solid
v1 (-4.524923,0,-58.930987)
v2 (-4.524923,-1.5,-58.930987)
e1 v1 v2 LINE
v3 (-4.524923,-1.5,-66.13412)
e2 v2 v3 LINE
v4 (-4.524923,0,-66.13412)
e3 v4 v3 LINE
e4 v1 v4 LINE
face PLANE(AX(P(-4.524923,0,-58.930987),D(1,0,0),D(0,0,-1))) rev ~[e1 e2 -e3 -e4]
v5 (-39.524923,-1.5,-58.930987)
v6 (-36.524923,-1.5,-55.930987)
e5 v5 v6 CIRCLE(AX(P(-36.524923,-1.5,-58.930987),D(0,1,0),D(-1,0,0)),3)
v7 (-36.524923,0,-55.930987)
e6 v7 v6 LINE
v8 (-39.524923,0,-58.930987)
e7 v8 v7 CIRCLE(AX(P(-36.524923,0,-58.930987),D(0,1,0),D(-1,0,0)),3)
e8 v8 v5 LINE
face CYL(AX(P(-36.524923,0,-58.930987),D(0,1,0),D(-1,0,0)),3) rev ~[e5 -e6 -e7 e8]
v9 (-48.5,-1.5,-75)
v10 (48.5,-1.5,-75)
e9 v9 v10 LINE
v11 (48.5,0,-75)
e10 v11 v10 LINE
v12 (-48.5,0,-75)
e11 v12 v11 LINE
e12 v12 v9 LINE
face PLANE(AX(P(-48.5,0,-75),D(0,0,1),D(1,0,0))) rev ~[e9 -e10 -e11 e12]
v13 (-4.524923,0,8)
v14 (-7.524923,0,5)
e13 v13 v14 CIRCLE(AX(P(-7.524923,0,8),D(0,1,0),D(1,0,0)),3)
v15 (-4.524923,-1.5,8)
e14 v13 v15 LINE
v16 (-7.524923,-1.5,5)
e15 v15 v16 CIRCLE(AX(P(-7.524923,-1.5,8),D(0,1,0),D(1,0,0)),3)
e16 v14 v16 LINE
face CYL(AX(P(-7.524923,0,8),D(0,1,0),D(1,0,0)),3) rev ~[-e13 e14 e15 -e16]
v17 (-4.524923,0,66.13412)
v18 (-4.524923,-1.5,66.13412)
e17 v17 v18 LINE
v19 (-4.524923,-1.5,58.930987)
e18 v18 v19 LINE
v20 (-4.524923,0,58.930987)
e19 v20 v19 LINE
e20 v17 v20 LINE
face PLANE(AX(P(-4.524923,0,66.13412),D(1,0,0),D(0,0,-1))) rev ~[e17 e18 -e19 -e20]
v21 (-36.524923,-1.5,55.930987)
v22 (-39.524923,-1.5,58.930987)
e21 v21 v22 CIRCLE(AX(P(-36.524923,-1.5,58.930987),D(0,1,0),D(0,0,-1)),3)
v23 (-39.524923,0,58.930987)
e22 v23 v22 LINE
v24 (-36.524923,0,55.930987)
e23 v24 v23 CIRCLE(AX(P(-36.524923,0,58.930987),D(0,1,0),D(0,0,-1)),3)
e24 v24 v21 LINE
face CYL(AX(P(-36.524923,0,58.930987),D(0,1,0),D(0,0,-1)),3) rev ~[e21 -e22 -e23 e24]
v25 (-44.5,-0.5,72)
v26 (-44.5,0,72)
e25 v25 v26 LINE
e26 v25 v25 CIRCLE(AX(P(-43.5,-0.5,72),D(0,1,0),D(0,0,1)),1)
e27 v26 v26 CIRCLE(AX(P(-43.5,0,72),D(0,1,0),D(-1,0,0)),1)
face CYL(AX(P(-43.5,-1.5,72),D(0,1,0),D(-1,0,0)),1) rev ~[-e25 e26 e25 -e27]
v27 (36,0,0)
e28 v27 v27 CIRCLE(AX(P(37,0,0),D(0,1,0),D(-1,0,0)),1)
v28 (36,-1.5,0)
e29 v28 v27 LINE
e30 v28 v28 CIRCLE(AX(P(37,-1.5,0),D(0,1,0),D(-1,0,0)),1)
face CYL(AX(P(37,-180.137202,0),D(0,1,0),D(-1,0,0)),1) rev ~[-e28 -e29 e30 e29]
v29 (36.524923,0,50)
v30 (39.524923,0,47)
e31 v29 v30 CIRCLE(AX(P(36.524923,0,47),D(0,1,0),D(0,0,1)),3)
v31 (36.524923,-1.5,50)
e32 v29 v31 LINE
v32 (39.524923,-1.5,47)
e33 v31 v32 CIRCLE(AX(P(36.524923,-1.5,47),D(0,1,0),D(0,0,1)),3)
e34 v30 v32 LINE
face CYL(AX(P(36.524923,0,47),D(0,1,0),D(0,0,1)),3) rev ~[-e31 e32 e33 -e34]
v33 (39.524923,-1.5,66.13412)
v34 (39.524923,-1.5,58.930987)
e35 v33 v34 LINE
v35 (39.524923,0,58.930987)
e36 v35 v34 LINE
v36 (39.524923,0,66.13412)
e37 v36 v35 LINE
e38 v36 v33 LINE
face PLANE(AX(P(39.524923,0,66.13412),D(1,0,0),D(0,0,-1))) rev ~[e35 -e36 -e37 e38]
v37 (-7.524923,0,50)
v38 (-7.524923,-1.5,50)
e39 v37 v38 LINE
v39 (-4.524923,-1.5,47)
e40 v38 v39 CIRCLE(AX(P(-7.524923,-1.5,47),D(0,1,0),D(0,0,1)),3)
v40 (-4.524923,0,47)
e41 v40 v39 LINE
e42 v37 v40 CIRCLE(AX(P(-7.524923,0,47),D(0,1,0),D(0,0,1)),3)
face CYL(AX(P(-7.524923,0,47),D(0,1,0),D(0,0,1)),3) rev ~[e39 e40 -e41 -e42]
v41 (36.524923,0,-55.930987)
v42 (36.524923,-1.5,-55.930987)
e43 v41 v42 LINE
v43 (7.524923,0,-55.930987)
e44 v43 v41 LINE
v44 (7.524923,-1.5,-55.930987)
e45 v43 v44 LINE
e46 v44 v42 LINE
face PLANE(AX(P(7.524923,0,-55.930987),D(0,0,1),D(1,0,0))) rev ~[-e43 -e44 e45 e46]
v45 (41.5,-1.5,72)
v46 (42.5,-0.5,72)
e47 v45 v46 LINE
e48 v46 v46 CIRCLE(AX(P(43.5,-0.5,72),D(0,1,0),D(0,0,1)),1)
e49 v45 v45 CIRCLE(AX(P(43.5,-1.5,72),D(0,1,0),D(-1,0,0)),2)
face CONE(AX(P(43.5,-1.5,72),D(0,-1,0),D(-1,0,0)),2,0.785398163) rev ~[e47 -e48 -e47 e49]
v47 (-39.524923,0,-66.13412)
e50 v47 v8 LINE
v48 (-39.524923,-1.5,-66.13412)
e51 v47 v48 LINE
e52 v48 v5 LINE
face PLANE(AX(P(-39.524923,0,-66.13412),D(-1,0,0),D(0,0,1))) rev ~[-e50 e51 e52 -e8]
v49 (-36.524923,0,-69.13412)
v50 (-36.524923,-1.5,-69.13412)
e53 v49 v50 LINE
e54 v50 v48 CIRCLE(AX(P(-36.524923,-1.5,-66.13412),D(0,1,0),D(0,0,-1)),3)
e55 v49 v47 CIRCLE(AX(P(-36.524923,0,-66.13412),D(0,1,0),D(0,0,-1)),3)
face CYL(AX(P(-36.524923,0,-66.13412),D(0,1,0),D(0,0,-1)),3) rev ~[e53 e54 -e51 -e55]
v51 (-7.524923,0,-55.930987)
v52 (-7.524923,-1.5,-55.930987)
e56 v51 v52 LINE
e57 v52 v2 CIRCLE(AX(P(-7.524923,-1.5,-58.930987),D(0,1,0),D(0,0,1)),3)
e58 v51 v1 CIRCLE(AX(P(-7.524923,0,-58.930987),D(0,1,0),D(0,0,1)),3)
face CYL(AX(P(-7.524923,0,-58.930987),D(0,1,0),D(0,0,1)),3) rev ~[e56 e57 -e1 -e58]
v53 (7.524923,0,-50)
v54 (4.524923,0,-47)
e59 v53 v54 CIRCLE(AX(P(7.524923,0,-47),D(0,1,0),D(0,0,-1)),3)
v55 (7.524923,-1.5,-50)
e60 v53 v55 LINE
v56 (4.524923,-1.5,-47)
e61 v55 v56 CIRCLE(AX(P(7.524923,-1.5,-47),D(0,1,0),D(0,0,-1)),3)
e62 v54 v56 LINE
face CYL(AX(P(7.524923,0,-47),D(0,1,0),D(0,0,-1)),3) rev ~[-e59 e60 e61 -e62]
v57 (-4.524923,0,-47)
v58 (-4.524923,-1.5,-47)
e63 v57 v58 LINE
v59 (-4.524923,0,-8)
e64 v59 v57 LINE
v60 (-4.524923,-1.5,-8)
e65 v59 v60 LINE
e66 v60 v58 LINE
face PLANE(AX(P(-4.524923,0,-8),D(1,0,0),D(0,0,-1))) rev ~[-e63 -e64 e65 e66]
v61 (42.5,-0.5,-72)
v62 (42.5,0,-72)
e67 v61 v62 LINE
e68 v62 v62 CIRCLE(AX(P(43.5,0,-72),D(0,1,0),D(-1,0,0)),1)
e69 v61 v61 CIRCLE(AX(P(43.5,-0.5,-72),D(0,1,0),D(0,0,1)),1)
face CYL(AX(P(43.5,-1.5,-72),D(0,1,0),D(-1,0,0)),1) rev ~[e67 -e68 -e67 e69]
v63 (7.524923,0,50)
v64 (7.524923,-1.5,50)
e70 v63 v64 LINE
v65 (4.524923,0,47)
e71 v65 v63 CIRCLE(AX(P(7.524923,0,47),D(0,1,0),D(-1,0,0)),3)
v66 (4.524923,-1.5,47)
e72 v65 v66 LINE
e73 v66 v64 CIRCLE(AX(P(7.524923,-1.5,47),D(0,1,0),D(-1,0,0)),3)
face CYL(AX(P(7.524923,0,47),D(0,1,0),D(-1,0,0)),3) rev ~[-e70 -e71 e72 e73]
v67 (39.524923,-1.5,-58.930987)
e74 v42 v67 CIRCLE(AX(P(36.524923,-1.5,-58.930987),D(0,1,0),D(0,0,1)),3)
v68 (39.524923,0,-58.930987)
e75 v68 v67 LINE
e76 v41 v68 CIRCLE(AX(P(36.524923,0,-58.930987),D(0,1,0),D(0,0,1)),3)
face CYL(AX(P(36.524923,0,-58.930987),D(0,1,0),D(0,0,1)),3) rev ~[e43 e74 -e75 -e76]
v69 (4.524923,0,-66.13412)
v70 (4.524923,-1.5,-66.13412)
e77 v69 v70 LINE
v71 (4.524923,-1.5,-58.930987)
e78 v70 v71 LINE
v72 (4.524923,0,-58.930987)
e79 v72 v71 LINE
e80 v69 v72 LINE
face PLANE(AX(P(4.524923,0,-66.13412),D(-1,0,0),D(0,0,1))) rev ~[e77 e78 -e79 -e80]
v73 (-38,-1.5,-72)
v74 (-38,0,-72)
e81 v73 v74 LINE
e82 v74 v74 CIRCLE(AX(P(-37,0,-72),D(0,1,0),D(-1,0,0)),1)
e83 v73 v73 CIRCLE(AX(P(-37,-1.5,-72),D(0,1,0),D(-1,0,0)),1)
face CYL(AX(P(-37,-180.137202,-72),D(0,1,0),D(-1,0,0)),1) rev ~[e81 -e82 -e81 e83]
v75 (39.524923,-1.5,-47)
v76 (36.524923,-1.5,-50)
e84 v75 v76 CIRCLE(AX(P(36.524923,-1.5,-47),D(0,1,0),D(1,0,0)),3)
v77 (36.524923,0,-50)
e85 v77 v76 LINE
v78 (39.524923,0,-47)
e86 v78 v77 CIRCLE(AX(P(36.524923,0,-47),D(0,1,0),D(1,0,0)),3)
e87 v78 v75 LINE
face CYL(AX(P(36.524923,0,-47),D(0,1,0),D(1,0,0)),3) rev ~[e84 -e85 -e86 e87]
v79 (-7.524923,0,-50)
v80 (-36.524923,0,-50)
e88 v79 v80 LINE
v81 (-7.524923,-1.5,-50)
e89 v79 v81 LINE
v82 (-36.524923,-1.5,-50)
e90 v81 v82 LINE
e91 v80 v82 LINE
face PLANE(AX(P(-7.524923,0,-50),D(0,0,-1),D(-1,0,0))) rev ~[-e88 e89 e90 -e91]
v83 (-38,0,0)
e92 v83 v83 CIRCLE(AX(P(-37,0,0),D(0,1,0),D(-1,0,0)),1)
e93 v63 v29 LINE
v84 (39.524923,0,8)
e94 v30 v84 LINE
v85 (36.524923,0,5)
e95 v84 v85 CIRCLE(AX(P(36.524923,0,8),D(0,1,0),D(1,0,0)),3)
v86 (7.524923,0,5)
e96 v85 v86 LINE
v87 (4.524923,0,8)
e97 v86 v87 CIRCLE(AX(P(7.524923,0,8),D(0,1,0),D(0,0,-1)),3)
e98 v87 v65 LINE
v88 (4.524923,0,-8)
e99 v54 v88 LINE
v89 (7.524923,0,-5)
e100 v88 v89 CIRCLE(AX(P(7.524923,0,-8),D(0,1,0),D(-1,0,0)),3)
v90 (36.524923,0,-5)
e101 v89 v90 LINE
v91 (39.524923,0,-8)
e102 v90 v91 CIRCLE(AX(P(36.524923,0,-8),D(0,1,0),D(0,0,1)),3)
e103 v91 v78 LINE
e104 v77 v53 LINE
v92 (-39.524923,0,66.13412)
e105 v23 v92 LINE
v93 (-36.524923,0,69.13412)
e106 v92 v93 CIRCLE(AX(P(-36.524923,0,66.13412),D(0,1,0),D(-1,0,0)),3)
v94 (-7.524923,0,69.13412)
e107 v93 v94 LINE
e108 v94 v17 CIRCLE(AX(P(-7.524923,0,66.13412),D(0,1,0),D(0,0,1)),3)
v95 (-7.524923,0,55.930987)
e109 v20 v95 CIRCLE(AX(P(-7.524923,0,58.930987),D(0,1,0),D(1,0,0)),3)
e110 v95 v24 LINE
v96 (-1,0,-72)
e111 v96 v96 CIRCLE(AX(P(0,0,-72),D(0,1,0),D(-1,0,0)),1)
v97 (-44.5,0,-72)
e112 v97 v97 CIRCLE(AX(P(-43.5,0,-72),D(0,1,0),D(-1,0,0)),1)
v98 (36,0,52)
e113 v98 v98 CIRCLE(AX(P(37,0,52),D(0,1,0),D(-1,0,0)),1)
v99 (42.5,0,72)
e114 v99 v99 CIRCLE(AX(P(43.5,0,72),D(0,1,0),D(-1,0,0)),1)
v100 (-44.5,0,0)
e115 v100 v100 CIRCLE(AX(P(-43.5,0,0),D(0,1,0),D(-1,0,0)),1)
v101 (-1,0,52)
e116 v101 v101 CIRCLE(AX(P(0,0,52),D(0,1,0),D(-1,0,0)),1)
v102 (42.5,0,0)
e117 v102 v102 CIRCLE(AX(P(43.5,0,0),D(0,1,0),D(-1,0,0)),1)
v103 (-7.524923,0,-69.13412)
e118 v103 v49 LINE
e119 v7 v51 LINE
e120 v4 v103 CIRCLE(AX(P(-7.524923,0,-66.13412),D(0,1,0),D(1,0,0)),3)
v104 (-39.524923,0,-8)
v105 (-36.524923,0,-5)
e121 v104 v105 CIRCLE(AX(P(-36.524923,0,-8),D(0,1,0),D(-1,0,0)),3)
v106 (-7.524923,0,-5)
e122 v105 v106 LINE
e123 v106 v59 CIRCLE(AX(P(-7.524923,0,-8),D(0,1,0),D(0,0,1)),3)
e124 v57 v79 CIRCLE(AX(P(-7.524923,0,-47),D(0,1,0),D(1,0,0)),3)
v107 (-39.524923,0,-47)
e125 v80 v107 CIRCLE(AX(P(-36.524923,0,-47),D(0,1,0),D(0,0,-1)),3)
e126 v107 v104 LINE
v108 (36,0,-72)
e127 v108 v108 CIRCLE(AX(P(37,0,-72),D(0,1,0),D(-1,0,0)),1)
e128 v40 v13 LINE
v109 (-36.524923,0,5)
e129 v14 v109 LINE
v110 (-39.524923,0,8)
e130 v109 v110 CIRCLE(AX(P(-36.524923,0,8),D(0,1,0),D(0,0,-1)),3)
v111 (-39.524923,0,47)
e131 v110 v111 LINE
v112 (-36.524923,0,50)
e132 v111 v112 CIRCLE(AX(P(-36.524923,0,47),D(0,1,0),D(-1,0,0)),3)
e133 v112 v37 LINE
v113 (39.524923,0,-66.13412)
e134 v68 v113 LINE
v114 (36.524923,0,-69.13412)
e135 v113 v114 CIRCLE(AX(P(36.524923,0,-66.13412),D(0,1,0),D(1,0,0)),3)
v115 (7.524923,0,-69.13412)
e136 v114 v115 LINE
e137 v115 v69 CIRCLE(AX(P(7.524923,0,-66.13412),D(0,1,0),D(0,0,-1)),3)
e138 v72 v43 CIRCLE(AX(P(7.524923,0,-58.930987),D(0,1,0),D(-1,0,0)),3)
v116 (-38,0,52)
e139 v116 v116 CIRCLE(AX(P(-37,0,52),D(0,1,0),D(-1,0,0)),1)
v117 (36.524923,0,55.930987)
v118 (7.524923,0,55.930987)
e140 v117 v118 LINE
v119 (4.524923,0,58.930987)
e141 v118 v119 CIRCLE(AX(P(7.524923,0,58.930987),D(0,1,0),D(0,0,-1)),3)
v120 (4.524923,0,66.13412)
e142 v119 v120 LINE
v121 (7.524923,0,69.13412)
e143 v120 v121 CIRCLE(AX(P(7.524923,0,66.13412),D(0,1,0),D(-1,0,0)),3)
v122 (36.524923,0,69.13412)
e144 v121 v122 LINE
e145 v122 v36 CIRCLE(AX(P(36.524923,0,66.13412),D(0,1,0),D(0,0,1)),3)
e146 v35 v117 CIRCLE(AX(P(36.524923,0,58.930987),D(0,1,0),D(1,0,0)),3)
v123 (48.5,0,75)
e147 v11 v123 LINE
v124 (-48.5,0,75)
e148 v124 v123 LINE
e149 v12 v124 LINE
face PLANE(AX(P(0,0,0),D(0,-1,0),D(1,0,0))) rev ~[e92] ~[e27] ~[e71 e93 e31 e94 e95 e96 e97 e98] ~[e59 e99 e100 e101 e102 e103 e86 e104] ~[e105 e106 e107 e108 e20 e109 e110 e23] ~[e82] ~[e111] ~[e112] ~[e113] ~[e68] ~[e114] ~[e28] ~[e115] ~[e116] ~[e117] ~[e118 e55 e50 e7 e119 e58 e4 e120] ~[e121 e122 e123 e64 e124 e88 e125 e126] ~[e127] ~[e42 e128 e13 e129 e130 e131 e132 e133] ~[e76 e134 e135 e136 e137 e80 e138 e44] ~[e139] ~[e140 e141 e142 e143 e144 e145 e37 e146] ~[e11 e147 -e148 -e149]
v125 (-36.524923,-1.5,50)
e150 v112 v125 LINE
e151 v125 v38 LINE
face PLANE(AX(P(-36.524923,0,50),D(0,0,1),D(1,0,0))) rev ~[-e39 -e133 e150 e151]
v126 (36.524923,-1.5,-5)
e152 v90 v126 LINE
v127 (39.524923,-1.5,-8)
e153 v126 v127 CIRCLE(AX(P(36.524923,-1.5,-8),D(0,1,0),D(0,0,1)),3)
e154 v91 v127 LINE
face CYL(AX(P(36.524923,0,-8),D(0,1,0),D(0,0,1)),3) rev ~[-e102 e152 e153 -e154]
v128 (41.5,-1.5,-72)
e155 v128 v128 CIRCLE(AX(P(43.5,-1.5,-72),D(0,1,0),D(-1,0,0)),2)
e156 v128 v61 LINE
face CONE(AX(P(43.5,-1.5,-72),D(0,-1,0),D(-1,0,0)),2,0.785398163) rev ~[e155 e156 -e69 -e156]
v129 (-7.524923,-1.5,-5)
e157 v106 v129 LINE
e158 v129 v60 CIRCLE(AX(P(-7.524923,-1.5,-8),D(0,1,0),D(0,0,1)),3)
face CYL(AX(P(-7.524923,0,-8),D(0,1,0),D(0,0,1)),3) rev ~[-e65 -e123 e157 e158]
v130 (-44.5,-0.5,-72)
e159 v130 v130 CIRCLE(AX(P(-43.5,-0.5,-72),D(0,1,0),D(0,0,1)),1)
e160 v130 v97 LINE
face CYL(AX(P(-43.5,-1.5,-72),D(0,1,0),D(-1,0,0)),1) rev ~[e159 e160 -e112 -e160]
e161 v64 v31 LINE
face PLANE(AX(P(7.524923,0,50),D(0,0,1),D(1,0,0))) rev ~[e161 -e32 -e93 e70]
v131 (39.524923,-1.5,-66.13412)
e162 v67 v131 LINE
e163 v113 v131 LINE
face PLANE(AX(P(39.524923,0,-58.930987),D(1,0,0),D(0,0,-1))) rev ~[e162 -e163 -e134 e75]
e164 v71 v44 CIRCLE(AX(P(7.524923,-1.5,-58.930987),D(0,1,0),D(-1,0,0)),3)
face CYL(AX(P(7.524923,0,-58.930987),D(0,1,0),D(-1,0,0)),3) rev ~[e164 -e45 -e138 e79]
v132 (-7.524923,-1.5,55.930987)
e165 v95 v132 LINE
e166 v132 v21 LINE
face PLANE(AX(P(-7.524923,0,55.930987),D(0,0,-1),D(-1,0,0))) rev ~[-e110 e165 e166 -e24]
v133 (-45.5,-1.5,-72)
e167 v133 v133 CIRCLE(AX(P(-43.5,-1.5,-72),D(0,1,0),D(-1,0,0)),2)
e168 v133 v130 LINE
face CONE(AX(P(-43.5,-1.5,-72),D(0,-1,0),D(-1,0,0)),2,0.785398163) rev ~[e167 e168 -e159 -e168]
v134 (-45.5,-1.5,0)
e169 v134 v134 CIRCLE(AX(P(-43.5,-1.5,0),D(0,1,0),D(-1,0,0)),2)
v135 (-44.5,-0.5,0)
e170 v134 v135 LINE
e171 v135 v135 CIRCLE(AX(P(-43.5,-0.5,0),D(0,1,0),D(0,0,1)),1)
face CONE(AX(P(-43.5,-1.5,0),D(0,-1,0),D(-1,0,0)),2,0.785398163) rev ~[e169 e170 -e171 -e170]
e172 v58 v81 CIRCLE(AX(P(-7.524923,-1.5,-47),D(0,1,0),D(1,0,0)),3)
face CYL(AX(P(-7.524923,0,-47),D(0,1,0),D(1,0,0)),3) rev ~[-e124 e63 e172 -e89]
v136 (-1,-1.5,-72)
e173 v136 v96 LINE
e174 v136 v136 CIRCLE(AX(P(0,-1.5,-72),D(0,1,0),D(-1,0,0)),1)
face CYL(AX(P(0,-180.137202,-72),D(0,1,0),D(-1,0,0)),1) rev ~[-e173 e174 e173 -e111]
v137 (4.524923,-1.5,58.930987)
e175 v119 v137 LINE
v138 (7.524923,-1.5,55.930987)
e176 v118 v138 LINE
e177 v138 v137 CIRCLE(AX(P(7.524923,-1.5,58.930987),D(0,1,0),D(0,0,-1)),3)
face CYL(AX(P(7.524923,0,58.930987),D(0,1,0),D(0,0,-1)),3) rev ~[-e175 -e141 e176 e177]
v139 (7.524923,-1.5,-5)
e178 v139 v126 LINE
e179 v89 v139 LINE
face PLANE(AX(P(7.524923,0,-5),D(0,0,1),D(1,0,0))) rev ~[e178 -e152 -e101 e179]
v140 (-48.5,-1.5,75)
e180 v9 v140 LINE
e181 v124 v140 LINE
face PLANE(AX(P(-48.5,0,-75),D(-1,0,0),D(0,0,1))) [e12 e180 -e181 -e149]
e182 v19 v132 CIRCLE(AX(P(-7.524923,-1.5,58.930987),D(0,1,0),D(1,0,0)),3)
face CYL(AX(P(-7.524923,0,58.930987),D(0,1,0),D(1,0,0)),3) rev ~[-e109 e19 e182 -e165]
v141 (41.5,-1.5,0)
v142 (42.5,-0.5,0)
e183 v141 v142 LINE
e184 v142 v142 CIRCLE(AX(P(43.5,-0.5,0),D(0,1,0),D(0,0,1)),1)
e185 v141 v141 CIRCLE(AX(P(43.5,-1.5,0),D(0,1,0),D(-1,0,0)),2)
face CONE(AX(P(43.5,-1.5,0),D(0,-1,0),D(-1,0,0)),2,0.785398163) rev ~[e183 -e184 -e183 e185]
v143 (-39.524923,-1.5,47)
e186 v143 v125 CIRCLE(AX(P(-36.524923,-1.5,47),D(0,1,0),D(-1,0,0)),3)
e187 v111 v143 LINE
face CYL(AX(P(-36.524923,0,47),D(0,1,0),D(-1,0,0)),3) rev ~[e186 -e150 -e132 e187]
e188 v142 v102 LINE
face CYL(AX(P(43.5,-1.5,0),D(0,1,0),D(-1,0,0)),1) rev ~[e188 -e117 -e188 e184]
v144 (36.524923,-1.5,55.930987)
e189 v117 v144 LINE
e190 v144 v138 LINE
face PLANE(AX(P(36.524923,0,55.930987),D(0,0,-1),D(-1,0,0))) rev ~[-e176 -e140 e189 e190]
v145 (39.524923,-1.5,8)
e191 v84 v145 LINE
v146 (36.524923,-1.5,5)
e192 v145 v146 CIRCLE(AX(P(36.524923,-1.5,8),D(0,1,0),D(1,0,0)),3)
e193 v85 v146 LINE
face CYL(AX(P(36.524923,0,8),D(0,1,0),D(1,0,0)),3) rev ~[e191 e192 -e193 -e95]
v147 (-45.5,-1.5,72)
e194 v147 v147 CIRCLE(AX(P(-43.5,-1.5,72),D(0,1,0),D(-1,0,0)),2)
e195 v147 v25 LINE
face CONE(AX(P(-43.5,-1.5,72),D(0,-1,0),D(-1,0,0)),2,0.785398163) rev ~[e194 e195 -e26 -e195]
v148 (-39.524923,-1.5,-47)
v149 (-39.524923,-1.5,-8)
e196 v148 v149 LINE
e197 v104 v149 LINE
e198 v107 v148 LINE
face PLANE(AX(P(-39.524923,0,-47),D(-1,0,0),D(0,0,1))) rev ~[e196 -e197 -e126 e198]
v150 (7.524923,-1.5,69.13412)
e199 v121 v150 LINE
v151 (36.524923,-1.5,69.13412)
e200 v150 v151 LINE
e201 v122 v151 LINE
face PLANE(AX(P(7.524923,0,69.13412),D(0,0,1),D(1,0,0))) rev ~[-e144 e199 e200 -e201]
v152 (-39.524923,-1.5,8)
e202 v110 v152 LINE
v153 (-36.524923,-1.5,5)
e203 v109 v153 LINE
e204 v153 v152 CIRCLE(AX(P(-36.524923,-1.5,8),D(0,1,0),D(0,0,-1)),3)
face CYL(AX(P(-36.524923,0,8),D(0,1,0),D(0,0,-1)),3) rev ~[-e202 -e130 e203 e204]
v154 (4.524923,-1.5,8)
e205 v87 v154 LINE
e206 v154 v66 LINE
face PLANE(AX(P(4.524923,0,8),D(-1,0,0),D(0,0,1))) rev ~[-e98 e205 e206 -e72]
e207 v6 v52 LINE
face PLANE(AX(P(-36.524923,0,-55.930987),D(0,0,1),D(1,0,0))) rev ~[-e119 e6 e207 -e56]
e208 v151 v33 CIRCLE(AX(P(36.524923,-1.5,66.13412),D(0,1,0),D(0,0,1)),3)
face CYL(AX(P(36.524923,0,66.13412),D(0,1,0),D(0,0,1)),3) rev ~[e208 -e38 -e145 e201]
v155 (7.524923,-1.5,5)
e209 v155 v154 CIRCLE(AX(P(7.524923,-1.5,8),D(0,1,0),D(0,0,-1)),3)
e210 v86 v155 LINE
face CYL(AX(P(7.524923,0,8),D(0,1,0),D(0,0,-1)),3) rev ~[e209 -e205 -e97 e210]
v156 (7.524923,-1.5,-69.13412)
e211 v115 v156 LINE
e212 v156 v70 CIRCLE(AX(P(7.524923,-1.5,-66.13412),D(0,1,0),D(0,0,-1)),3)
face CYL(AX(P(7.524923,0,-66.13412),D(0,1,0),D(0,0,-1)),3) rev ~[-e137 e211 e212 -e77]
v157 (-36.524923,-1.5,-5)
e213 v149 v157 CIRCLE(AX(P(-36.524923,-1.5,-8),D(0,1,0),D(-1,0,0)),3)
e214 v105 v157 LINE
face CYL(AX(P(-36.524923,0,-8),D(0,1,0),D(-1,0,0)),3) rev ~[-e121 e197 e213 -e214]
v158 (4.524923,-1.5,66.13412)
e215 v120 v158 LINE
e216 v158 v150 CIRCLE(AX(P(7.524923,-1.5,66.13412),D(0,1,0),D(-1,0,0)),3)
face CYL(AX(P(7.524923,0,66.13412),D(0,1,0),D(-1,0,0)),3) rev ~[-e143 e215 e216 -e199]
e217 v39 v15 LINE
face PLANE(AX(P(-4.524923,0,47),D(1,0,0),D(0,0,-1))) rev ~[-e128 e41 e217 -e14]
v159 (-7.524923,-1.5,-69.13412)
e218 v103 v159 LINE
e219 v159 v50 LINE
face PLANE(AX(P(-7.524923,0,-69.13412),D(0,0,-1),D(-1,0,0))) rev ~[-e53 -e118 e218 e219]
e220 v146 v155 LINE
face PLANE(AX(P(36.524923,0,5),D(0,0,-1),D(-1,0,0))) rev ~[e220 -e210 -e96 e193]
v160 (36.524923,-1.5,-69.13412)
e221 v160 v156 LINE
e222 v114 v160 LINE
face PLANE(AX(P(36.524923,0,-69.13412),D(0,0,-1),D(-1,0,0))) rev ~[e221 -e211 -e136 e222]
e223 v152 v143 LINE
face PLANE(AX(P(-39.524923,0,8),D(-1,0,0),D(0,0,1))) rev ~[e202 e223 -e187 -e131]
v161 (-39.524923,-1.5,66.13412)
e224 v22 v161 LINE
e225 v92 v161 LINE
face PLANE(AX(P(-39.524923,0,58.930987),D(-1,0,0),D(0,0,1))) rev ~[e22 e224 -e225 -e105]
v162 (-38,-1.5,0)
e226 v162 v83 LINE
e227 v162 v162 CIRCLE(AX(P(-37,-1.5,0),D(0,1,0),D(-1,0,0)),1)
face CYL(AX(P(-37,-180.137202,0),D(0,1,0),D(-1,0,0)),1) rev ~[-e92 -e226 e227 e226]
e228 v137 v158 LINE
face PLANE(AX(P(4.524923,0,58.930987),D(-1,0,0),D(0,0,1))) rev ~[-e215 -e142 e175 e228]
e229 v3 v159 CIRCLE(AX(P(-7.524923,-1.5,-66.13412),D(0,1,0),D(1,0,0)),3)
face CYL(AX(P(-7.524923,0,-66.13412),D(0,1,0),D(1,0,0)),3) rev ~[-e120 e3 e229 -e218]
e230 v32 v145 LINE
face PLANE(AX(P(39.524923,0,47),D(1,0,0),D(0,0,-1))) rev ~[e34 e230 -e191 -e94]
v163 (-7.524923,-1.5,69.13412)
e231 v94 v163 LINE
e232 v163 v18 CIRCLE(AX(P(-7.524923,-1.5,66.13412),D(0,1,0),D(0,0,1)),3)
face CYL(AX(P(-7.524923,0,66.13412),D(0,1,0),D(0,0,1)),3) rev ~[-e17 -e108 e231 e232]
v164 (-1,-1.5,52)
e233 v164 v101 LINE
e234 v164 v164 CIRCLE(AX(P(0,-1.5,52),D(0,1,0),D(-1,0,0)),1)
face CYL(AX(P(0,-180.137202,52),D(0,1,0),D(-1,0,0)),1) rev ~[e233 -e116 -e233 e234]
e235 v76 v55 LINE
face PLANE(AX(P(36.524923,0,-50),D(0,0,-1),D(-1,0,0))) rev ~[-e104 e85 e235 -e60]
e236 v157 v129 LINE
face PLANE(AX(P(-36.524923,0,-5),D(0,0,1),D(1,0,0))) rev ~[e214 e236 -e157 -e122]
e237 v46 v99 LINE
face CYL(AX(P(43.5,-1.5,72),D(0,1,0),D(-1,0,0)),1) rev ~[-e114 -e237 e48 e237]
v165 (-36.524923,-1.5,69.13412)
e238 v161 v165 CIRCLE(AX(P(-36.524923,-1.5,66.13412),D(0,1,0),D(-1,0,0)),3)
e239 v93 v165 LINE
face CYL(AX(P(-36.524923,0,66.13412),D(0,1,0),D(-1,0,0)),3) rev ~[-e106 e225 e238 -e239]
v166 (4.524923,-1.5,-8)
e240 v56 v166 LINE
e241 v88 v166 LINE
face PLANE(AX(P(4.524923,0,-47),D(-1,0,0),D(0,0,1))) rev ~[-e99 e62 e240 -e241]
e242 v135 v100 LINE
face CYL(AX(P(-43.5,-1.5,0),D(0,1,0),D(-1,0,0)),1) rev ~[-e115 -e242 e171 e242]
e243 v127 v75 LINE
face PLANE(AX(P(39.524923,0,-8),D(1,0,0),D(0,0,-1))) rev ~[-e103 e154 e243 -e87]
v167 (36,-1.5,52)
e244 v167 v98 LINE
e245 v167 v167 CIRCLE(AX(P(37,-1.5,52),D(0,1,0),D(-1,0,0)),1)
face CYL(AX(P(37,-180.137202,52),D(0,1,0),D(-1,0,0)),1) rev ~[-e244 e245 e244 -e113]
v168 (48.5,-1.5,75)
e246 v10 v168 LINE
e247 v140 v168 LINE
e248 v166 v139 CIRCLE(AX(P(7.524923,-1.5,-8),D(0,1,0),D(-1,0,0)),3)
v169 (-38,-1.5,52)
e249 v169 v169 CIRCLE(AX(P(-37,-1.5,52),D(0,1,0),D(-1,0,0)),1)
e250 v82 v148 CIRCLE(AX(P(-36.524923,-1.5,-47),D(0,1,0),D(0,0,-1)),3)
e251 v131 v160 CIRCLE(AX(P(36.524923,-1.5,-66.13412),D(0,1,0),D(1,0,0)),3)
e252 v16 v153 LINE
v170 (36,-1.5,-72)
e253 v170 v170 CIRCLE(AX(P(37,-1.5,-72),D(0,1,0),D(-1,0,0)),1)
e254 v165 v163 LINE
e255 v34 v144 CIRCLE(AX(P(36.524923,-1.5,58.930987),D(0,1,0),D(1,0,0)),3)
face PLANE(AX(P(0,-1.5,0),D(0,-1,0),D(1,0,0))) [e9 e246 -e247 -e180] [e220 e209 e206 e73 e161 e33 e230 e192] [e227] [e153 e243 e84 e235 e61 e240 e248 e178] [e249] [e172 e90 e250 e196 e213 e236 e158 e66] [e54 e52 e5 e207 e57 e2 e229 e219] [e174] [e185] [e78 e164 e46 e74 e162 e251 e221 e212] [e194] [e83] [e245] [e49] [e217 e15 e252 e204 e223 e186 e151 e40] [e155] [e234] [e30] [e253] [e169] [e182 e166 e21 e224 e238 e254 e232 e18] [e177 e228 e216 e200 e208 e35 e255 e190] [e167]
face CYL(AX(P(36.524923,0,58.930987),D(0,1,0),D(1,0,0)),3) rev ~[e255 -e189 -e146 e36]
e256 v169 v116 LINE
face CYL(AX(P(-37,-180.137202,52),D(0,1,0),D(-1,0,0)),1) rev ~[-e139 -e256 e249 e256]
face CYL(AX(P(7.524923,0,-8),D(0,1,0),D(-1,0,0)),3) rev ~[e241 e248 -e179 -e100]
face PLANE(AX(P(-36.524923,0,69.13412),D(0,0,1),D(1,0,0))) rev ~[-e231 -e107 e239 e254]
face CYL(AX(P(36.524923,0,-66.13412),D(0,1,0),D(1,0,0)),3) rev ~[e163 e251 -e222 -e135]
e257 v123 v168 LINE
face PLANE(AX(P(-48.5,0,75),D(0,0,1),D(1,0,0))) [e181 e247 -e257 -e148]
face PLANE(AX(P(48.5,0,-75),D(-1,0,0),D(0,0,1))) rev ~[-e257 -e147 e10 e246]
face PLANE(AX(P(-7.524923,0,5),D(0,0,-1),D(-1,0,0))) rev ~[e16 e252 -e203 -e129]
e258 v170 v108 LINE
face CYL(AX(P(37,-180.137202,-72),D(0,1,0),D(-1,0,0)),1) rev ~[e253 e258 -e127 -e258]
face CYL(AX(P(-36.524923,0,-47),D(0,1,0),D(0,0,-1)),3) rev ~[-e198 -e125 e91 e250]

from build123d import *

# Parameters (mm, degrees)
F0_W           = 97
F0_H           = 150
F1_DEPTH       = 1.5
F3_D           = 2
F3_CSINK_D     = 4
F3_CSINK_ANGLE = 90
F5_D           = 2


# Not quite as in the source:
# - a feature names something its author has since deleted; it is built from what else it names


with BuildPart() as f1:
    # F0 (on Front) → F1 (new body)
    with BuildSketch(Plane.XZ):
        Rectangle(F0_W, F0_H)
        with BuildLine():
            Line((-4.5249225795, -58.9309873283), (-4.5249225795, -66.1341202259))
            ThreePointArc((-4.5249225795, -66.1341202259), (-5.403602236, -68.2554405695), (-7.5249225795, -69.1341202259))
            Line((-7.5249225795, -69.1341202259), (-36.5249225795, -69.1341202259))
            ThreePointArc((-36.5249225795, -69.1341202259), (-38.6462429231, -68.2554405695), (-39.5249225795, -66.1341202259))
            Line((-39.5249225795, -66.1341202259), (-39.5249225795, -58.9309873283))
            ThreePointArc((-39.5249225795, -58.9309873283), (-38.6462429231, -56.8096669847), (-36.5249225795, -55.9309873283))
            Line((-36.5249225795, -55.9309873283), (-7.5249225795, -55.9309873283))
            ThreePointArc((-7.5249225795, -55.9309873283), (-5.403602236, -56.8096669847), (-4.5249225795, -58.9309873283))
        make_face(mode=Mode.SUBTRACT)
        with BuildLine():
            Line((-36.5249225795, -5), (-7.5249225795, -5))
            ThreePointArc((-7.5249225795, -5), (-5.403602236, -5.8786796564), (-4.5249225795, -8))
            Line((-4.5249225795, -8), (-4.5249225795, -47))
            ThreePointArc((-4.5249225795, -47), (-5.403602236, -49.1213203436), (-7.5249225795, -50))
            Line((-7.5249225795, -50), (-36.5249225795, -50))
            ThreePointArc((-36.5249225795, -50), (-38.6462429231, -49.1213203436), (-39.5249225795, -47))
            Line((-39.5249225795, -47), (-39.5249225795, -8))
            ThreePointArc((-39.5249225795, -8), (-38.6462429231, -5.8786796564), (-36.5249225795, -5))
        make_face(mode=Mode.SUBTRACT)
        with BuildLine():
            ThreePointArc((4.5249225795, -58.9309873283), (5.403602236, -56.8096669847), (7.5249225795, -55.9309873283))
            Line((7.5249225795, -55.9309873283), (36.5249225795, -55.9309873283))
            ThreePointArc((36.5249225795, -55.9309873283), (38.6462429231, -56.8096669847), (39.5249225795, -58.9309873283))
            Line((39.5249225795, -58.9309873283), (39.5249225795, -66.1341202259))
            ThreePointArc((39.5249225795, -66.1341202259), (38.6462429231, -68.2554405695), (36.5249225795, -69.1341202259))
            Line((36.5249225795, -69.1341202259), (7.5249225795, -69.1341202259))
            ThreePointArc((7.5249225795, -69.1341202259), (5.403602236, -68.2554405695), (4.5249225795, -66.1341202259))
            Line((4.5249225795, -66.1341202259), (4.5249225795, -58.9309873283))
        make_face(mode=Mode.SUBTRACT)
        with BuildLine():
            ThreePointArc((39.5249225795, -47), (38.6462429231, -49.1213203436), (36.5249225795, -50))
            Line((36.5249225795, -50), (7.5249225795, -50))
            ThreePointArc((7.5249225795, -50), (5.403602236, -49.1213203436), (4.5249225795, -47))
            Line((4.5249225795, -47), (4.5249225795, -8))
            ThreePointArc((4.5249225795, -8), (5.403602236, -5.8786796564), (7.5249225795, -5))
            Line((7.5249225795, -5), (36.5249225795, -5))
            ThreePointArc((36.5249225795, -5), (38.6462429231, -5.8786796564), (39.5249225795, -8))
            Line((39.5249225795, -8), (39.5249225795, -47))
        make_face(mode=Mode.SUBTRACT)
        with BuildLine():
            ThreePointArc((-4.5249225795, 8), (-5.403602236, 5.8786796564), (-7.5249225795, 5))
            Line((-7.5249225795, 5), (-36.5249225795, 5))
            ThreePointArc((-36.5249225795, 5), (-38.6462429231, 5.8786796564), (-39.5249225795, 8))
            Line((-39.5249225795, 8), (-39.5249225795, 47))
            ThreePointArc((-39.5249225795, 47), (-38.6462429231, 49.1213203436), (-36.5249225795, 50))
            Line((-36.5249225795, 50), (-7.5249225795, 50))
            ThreePointArc((-7.5249225795, 50), (-5.403602236, 49.1213203436), (-4.5249225795, 47))
            Line((-4.5249225795, 47), (-4.5249225795, 8))
        make_face(mode=Mode.SUBTRACT)
        with BuildLine():
            ThreePointArc((-4.5249225795, 58.9309873283), (-5.403602236, 56.8096669847), (-7.5249225795, 55.9309873283))
            Line((-7.5249225795, 55.9309873283), (-36.5249225795, 55.9309873283))
            ThreePointArc((-36.5249225795, 55.9309873283), (-38.6462429231, 56.8096669847), (-39.5249225795, 58.9309873283))
            Line((-39.5249225795, 58.9309873283), (-39.5249225795, 66.1341202259))
            ThreePointArc((-39.5249225795, 66.1341202259), (-38.6462429231, 68.2554405695), (-36.5249225795, 69.1341202259))
            Line((-36.5249225795, 69.1341202259), (-7.5249225795, 69.1341202259))
            ThreePointArc((-7.5249225795, 69.1341202259), (-5.403602236, 68.2554405695), (-4.5249225795, 66.1341202259))
            Line((-4.5249225795, 66.1341202259), (-4.5249225795, 58.9309873283))
        make_face(mode=Mode.SUBTRACT)
        with BuildLine():
            ThreePointArc((7.5249225795, 5), (5.403602236, 5.8786796564), (4.5249225795, 8))
            Line((4.5249225795, 8), (4.5249225795, 47))
            ThreePointArc((4.5249225795, 47), (5.403602236, 49.1213203436), (7.5249225795, 50))
            Line((7.5249225795, 50), (36.5249225795, 50))
            ThreePointArc((36.5249225795, 50), (38.6462429231, 49.1213203436), (39.5249225795, 47))
            Line((39.5249225795, 47), (39.5249225795, 8))
            ThreePointArc((39.5249225795, 8), (38.6462429231, 5.8786796564), (36.5249225795, 5))
            Line((36.5249225795, 5), (7.5249225795, 5))
        make_face(mode=Mode.SUBTRACT)
        with BuildLine():
            Line((7.5249225795, 69.1341202259), (36.5249225795, 69.1341202259))
            ThreePointArc((36.5249225795, 69.1341202259), (38.6462429231, 68.2554405695), (39.5249225795, 66.1341202259))
            Line((39.5249225795, 66.1341202259), (39.5249225795, 58.9309873283))
            ThreePointArc((39.5249225795, 58.9309873283), (38.6462429231, 56.8096669847), (36.5249225795, 55.9309873283))
            Line((36.5249225795, 55.9309873283), (7.5249225795, 55.9309873283))
            ThreePointArc((7.5249225795, 55.9309873283), (5.403602236, 56.8096669847), (4.5249225795, 58.9309873283))
            Line((4.5249225795, 58.9309873283), (4.5249225795, 66.1341202259))
            ThreePointArc((4.5249225795, 66.1341202259), (5.403602236, 68.2554405695), (7.5249225795, 69.1341202259))
        make_face(mode=Mode.SUBTRACT)
    extrude(amount=F1_DEPTH)

    # F3 (through all)
    with Locations(Plane.XZ.offset(1.5)):
        with Locations((-43.5, -72), (43.5, -72), (43.5, 72), (-43.5, 72), (-43.5, 0), (43.5, 0)):
            CounterSinkHole(F3_D / 2, F3_CSINK_D / 2, counter_sink_angle=F3_CSINK_ANGLE)

    # F5 (through all)
    with Locations(Plane.XZ.offset(1.5)):
        with Locations((-37, -72), (0, -72), (37, -72), (0, 52), (-37, 52), (37, 52), (-37, 0), (37, 0)):
            Hole(F5_D / 2)


solid = f1.part
